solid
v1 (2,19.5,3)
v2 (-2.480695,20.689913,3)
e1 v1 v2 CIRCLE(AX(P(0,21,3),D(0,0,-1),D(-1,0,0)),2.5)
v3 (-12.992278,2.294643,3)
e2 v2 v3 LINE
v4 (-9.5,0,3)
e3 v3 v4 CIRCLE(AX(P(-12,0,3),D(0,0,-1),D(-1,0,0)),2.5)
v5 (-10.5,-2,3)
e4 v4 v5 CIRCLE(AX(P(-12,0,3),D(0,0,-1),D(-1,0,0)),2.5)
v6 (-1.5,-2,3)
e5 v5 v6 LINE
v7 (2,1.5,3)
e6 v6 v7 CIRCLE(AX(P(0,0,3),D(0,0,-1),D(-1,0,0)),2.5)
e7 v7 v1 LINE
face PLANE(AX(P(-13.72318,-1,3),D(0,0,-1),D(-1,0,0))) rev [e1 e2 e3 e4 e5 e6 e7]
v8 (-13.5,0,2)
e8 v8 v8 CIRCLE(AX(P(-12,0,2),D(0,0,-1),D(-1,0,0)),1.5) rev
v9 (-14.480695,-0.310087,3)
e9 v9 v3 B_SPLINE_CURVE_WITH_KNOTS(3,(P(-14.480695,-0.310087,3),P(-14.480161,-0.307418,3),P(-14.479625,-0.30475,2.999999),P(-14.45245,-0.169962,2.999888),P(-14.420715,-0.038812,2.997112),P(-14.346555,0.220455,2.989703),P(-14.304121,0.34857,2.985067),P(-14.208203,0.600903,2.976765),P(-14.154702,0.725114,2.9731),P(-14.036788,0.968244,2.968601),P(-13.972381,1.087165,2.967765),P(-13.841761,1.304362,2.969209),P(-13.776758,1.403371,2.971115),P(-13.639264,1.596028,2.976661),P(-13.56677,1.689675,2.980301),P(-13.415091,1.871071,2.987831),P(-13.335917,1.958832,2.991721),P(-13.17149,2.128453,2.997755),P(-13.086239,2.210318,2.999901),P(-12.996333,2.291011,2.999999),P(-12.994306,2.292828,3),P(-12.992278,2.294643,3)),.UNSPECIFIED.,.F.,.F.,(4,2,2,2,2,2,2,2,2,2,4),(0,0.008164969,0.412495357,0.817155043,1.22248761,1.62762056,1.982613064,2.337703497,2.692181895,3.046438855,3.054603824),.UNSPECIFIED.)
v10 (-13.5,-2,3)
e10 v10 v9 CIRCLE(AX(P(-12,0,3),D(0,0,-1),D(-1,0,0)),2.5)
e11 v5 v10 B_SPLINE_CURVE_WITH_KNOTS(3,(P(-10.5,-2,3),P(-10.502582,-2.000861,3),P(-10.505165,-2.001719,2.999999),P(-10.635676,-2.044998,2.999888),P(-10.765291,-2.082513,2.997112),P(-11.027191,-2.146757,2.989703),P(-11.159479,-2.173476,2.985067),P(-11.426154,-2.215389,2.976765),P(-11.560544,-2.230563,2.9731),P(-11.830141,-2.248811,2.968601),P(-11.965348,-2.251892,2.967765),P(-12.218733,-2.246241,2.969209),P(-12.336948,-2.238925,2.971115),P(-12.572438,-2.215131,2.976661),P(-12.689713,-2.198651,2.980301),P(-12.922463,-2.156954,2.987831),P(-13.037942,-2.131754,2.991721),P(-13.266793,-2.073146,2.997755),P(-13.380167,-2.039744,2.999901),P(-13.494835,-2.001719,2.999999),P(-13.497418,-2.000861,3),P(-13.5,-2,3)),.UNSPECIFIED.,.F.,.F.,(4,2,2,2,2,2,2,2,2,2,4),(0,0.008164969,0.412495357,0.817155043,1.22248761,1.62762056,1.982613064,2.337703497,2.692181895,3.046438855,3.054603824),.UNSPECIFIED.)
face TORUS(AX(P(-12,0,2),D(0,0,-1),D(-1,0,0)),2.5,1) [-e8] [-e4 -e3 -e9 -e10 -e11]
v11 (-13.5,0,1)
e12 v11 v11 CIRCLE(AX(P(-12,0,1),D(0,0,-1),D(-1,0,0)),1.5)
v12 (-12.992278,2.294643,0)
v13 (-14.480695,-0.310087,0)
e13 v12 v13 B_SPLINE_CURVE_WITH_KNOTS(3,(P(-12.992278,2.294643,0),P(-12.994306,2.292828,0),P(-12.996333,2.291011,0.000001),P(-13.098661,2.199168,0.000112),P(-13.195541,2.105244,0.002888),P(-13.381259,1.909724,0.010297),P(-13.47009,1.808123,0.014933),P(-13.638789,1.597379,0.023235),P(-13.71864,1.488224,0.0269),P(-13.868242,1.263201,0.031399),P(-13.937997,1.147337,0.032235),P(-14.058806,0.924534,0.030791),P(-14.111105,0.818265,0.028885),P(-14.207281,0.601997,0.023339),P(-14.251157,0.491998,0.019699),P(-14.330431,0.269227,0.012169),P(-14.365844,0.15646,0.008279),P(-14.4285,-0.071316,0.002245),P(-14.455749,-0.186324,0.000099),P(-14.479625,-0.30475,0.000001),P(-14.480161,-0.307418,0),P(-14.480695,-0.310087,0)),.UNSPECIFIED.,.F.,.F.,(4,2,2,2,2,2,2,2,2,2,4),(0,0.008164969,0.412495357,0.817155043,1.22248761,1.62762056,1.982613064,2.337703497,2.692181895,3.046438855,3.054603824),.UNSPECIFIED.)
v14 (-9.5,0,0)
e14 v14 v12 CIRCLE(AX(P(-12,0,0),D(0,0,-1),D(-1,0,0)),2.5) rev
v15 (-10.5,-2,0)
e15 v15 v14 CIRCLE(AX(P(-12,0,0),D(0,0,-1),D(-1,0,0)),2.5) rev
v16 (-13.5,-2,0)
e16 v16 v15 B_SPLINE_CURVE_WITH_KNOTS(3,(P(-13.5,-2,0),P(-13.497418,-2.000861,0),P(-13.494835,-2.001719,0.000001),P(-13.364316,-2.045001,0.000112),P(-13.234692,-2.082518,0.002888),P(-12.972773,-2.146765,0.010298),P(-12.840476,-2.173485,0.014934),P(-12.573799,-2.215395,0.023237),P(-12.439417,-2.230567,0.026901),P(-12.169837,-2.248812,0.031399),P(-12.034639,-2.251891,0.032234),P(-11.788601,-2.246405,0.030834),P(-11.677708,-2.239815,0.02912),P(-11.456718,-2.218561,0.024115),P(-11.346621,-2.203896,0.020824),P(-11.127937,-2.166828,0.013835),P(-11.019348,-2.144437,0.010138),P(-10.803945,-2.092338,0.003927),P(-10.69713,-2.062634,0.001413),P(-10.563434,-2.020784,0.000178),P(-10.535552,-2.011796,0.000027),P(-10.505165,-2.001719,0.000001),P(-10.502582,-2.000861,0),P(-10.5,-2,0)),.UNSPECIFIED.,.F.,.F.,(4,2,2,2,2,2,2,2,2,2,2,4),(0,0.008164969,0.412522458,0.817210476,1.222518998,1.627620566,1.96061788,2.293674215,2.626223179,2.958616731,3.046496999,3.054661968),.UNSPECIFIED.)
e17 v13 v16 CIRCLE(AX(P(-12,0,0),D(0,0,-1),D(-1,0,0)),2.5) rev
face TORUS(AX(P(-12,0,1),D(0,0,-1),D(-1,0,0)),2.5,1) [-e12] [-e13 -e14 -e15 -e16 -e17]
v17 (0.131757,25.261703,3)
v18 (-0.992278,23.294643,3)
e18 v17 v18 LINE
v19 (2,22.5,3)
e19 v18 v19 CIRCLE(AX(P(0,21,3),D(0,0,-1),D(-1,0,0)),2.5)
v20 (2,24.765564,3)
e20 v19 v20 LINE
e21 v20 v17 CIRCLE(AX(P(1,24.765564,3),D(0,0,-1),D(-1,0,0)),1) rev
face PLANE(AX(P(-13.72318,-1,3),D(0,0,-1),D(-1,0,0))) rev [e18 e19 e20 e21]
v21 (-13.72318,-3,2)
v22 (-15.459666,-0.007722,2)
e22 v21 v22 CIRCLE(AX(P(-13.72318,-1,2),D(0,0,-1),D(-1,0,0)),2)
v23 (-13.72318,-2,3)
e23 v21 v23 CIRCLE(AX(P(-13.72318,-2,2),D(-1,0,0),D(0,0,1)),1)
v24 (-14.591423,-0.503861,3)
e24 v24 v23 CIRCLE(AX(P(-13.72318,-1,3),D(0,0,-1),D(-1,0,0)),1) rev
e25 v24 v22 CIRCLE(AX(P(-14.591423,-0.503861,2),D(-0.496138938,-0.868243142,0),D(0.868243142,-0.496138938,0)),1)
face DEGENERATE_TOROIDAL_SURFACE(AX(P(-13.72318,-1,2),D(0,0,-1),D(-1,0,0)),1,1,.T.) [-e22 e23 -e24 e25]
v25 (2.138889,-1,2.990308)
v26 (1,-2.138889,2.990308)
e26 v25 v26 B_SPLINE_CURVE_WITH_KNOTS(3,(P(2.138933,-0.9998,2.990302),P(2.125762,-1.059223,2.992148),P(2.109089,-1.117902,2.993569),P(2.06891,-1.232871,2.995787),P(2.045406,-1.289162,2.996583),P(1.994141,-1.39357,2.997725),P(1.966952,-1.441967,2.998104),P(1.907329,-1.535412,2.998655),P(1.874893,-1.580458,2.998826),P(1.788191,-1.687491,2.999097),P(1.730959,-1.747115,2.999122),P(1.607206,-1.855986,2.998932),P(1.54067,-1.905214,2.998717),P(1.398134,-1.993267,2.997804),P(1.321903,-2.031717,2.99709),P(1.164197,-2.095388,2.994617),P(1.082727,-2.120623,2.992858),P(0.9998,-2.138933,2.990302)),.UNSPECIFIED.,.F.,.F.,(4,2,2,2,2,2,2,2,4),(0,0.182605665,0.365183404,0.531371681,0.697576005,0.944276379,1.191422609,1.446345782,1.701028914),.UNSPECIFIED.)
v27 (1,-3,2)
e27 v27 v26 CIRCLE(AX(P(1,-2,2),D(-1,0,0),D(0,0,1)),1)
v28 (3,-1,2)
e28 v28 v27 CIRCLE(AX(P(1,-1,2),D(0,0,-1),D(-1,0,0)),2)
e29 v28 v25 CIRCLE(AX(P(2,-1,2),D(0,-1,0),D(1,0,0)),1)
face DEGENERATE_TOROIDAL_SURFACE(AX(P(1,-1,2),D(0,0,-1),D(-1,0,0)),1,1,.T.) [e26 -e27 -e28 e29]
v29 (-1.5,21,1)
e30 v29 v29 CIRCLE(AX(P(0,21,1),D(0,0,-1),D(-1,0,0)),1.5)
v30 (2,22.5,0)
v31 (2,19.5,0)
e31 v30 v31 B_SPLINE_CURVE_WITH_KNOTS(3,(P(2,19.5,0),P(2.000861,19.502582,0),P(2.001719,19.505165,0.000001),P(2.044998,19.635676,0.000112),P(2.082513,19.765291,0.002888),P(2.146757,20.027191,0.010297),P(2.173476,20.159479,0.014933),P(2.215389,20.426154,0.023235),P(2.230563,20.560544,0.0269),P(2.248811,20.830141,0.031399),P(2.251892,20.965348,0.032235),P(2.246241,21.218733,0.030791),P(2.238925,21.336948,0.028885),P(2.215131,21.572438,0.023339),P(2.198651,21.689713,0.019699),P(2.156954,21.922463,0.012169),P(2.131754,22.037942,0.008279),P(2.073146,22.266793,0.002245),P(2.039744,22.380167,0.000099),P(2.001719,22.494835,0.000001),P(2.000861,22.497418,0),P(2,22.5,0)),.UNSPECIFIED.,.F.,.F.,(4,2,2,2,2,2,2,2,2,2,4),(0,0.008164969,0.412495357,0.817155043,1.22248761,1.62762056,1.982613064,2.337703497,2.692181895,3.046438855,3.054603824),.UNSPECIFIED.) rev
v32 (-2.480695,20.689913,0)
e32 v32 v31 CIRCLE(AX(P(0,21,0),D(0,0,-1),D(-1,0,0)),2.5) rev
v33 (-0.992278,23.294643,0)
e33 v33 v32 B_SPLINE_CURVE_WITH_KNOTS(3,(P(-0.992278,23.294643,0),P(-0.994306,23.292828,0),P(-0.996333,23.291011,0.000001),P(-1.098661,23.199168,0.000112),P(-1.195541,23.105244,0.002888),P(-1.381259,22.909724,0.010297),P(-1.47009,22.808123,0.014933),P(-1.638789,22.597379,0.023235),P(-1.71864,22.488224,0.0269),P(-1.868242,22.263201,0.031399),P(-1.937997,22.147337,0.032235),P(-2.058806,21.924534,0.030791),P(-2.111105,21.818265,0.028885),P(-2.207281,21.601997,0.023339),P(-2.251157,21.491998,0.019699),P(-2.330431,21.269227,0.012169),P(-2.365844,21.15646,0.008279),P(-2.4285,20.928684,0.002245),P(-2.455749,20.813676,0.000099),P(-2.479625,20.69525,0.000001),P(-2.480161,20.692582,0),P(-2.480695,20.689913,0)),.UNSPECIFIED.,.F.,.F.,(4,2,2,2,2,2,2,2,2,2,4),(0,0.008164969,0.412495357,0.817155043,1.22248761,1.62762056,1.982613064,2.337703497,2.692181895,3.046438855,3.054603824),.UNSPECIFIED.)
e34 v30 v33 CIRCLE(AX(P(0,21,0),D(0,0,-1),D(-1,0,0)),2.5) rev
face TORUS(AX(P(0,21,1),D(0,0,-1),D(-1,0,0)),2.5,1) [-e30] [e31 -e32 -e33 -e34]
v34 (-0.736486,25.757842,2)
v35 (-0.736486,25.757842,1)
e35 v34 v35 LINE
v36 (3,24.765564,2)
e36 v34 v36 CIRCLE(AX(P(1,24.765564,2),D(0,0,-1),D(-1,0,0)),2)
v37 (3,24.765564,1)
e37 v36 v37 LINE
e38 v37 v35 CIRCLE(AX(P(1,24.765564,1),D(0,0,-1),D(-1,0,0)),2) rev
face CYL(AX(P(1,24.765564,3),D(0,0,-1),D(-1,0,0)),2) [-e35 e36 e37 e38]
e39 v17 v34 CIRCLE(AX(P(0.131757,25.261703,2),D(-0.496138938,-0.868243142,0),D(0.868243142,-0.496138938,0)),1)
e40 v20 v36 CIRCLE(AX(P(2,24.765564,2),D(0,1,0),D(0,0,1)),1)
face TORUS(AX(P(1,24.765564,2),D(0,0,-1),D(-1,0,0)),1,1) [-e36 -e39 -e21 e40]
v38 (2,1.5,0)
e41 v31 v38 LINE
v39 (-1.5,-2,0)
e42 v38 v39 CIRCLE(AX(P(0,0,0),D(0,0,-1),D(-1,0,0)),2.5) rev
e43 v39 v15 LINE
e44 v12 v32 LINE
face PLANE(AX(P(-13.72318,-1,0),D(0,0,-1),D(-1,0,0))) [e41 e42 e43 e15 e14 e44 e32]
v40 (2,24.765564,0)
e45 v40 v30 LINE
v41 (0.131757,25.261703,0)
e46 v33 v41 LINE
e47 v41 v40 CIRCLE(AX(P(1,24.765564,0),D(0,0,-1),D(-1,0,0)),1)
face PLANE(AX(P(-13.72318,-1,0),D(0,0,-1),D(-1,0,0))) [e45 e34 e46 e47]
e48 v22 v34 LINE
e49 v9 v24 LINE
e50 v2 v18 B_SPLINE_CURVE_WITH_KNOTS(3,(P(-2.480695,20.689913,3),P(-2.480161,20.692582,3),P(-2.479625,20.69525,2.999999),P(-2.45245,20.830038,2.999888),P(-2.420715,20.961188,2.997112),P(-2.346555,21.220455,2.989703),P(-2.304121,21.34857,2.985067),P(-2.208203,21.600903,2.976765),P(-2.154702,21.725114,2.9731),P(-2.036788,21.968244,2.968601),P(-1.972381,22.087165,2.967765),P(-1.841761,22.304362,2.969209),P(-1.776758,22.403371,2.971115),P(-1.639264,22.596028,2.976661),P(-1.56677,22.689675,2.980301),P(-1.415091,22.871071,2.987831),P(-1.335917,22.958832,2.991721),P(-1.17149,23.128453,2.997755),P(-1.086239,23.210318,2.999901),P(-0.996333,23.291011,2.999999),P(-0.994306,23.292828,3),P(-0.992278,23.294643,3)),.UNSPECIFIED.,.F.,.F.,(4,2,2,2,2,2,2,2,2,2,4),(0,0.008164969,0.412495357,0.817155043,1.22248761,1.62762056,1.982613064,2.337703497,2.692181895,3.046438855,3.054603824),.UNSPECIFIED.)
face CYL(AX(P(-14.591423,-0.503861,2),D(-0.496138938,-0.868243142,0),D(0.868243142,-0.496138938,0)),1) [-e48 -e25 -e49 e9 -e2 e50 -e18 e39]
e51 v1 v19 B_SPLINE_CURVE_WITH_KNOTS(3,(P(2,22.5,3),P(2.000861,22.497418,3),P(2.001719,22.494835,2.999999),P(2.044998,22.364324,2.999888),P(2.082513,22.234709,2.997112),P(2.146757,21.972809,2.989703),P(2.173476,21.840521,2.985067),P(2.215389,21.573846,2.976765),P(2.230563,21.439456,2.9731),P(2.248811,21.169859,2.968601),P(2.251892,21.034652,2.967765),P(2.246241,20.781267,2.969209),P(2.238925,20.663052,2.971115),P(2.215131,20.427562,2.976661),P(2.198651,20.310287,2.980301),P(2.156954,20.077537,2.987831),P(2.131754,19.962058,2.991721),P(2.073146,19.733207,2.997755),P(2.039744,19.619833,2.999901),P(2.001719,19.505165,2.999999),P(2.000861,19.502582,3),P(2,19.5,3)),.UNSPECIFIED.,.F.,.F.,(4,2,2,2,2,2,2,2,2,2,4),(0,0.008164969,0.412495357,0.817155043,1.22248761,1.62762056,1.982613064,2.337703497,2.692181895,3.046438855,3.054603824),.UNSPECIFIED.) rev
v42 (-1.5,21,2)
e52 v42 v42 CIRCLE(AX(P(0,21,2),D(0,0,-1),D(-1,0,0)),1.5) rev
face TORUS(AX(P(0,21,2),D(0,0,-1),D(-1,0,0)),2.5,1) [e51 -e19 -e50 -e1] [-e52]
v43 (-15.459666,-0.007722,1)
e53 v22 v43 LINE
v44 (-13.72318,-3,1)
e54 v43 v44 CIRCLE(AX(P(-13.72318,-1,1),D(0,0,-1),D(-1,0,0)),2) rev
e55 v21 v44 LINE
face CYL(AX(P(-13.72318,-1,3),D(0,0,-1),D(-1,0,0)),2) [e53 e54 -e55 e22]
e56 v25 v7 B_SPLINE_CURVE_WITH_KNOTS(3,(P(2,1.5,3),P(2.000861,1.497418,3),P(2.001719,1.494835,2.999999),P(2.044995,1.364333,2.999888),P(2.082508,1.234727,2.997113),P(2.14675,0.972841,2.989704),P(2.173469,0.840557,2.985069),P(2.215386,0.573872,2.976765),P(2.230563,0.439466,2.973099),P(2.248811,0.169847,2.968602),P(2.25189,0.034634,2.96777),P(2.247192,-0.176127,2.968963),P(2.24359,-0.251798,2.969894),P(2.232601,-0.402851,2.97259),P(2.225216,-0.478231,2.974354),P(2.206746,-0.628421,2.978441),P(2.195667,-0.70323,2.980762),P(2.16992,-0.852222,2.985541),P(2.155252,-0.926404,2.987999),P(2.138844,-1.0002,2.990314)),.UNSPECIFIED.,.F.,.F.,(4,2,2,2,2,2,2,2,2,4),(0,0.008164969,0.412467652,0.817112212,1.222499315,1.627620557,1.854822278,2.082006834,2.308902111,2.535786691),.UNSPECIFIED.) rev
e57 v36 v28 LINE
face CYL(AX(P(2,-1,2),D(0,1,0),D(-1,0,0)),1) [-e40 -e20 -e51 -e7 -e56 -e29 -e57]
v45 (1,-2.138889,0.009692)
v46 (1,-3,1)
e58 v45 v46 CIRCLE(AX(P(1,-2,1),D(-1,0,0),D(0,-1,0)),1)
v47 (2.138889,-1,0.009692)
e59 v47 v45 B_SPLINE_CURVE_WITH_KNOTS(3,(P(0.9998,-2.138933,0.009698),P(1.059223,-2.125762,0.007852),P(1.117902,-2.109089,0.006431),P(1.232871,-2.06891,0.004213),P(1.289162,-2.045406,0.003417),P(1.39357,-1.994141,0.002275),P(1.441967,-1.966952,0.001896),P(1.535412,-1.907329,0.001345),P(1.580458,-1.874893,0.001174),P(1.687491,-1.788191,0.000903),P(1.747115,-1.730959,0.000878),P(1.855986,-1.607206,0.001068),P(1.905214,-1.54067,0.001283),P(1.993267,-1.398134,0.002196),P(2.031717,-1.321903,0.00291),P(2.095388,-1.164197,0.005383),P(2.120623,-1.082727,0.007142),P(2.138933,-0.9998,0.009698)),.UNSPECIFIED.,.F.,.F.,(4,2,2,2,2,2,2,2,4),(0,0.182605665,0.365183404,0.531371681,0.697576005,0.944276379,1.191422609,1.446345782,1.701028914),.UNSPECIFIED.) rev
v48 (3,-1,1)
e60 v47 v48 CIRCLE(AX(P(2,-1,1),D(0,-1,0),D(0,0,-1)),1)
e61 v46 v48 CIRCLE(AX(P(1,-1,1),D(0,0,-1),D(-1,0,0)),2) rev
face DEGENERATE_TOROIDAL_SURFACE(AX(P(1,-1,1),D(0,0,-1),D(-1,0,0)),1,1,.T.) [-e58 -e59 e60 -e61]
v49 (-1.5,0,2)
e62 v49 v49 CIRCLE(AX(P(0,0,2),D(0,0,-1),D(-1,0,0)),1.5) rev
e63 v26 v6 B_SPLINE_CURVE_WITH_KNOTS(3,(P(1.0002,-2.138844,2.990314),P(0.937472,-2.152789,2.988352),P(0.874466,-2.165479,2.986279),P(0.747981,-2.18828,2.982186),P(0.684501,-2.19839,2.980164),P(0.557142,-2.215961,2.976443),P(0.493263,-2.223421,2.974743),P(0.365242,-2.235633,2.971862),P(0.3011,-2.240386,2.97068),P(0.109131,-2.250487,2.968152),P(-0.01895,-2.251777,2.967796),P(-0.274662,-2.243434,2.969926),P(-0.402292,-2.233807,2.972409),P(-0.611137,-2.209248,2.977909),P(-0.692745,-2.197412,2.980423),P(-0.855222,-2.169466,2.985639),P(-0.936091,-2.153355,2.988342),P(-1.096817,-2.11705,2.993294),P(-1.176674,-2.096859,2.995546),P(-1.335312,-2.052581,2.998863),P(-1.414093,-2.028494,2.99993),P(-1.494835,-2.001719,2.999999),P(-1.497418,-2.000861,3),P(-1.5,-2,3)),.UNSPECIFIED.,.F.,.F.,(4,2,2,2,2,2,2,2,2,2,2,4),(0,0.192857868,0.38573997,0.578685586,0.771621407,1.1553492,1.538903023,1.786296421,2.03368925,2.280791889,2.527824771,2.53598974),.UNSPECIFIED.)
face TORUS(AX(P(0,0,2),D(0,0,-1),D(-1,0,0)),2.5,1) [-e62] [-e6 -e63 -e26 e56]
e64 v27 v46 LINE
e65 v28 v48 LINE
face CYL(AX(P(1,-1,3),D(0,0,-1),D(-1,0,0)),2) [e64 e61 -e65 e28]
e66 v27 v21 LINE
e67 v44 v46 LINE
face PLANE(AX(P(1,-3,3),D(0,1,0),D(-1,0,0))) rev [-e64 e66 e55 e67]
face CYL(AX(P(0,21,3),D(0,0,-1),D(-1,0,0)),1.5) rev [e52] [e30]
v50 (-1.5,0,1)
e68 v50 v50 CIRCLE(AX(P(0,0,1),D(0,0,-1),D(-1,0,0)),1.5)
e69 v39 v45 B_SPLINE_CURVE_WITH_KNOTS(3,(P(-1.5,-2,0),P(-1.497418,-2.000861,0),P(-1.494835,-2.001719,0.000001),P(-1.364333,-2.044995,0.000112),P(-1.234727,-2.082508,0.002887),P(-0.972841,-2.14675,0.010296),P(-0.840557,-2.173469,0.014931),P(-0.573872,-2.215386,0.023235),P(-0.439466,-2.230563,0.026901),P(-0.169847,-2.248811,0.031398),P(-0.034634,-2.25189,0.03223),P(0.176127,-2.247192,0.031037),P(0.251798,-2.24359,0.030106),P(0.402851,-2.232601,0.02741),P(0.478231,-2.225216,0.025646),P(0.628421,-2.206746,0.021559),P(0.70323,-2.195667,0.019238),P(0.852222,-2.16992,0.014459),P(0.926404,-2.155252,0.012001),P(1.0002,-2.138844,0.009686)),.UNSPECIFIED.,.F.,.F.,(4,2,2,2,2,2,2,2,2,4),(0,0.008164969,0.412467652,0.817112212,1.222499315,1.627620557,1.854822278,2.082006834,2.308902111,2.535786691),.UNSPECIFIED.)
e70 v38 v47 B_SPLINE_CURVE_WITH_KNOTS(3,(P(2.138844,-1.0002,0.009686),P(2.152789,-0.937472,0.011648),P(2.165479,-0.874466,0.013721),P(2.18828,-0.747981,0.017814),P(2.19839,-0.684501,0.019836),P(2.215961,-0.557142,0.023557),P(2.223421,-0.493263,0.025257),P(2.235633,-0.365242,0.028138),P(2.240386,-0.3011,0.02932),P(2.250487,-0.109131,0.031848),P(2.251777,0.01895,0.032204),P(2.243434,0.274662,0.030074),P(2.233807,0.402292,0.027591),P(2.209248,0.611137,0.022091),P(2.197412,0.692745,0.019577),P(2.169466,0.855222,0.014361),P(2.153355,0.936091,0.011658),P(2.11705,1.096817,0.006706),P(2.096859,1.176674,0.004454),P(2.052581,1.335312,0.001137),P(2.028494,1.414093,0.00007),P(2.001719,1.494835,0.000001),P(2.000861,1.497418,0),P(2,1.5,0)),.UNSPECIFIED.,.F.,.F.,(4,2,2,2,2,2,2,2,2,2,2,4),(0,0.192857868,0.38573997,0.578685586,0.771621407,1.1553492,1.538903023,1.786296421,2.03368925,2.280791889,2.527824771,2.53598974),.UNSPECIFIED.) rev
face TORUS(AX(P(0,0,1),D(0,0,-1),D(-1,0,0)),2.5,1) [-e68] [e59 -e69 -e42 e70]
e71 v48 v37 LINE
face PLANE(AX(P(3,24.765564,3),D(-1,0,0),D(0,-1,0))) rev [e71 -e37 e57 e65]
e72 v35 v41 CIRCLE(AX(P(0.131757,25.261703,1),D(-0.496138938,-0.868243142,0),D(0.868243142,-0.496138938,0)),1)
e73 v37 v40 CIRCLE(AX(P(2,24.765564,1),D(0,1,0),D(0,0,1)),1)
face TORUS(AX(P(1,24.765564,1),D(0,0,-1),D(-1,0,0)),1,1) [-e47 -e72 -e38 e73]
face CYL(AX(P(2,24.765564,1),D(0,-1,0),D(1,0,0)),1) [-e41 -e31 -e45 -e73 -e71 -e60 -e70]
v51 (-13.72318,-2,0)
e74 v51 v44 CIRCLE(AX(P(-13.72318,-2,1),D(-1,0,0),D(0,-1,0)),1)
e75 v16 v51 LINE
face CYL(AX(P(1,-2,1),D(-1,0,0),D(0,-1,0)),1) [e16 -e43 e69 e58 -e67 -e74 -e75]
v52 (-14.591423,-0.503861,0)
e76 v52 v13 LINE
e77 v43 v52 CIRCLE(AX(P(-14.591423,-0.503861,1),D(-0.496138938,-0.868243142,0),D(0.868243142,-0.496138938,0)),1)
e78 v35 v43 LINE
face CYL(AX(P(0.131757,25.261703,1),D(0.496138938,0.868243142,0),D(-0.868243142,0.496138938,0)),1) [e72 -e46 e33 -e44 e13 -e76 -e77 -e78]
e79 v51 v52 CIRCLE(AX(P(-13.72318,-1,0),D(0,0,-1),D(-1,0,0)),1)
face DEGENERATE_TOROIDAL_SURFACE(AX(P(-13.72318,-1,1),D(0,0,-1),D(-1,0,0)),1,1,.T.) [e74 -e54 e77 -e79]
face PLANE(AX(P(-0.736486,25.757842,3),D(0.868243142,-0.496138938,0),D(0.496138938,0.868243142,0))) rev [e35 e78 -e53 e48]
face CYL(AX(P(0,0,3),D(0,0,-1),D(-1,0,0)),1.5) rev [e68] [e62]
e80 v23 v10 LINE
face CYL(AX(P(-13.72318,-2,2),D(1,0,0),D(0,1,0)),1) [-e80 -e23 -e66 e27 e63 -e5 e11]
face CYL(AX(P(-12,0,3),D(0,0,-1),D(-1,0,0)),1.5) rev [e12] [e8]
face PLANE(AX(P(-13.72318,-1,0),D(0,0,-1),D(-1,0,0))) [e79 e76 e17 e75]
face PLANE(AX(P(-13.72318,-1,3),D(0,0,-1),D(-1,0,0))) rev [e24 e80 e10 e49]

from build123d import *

# Parameters (mm, degrees)
SKETCH1_R           = 1.5
BOSS_EXTRUDE1_DEPTH = 3
FILLET1_R           = 1


with BuildPart() as part:
    # Sketch1 → Boss-Extrude1 (new body)
    with BuildSketch(Plane.XY):
        with BuildLine():
            Line((3, 24.765564437), (3, -1))
            ThreePointArc((3, -1), (2.414213562, -2.414213562), (1, -3))
            Line((1, -3), (-12, -3))
            Line((-12, -3), (-13.723179678, -3))
            ThreePointArc((-13.723179678, -3), (-15.452999865, -2.003853636), (-15.459665963, -0.007722123))
            Line((-15.459665963, -0.007722123), (-0.736486284, 25.757842314))
            ThreePointArc((-0.736486284, 25.757842314), (1.51333587, 26.698563735), (3, 24.765564437))
        make_face()
        Circle(SKETCH1_R, mode=Mode.SUBTRACT)
        with Locations((0, 21)):
            Circle(SKETCH1_R, mode=Mode.SUBTRACT)
        with Locations((-12, 0)):
            Circle(SKETCH1_R, mode=Mode.SUBTRACT)
    extrude(amount=BOSS_EXTRUDE1_DEPTH)

    # Fillet1
    # the kernel refuses this fillet: 1 mm, written as the material it takes off along each edge
    with BuildSketch(Plane(origin=(-13.723179678, -1, 0), x_dir=(0, -1, 0), z_dir=(1, 0, 0))) as fillet1_piece_1:
        with BuildLine():
            CenterArc((2 - FILLET1_R, -FILLET1_R), FILLET1_R, 0, 90)
            Line((2 - FILLET1_R, 0), (2, 0))
            Line((2, 0), (2, -FILLET1_R))
        make_face()
    revolve(axis=Axis((-13.723179678, -1, 0), (0, 0, -1)), revolution_arc=119.744881297, mode=Mode.SUBTRACT)
    with BuildSketch(Plane(origin=(1, -1, 3), x_dir=(1, 0, 0), z_dir=(0, 1, 0))) as fillet1_piece_2:
        with BuildLine():
            CenterArc((2 - FILLET1_R, FILLET1_R), FILLET1_R, 270, 90)
            Line((2, FILLET1_R), (2, 0))
            Line((2, 0), (2 - FILLET1_R, 0))
        make_face()
    revolve(axis=Axis((1, -1, 3), (0, 0, -1)), revolution_arc=90, mode=Mode.SUBTRACT)
    with BuildSketch(Plane(origin=(0, 21, 0), x_dir=(1, 0, 0), z_dir=(0, -1, 0))) as fillet1_piece_3:
        with BuildLine():
            CenterArc((1.5 + FILLET1_R, FILLET1_R), FILLET1_R, 180, 90)
            Line((1.5 + FILLET1_R, 0), (1.5, 0))
            Line((1.5, 0), (1.5, FILLET1_R))
        make_face()
    revolve(axis=Axis((0, 21, 0), (0, 0, 1)), mode=Mode.SUBTRACT)
    with BuildSketch(Plane(origin=(0, 21, 3), x_dir=(1, 0, 0), z_dir=(0, -1, 0))) as fillet1_piece_4:
        with BuildLine():
            CenterArc((1.5 + FILLET1_R, -FILLET1_R), FILLET1_R, 90, 90)
            Line((1.5, -FILLET1_R), (1.5, 0))
            Line((1.5, 0), (1.5 + FILLET1_R, 0))
        make_face()
    revolve(axis=Axis((0, 21, 3), (0, 0, 1)), mode=Mode.SUBTRACT)
    with BuildSketch(Plane(origin=(3, 24.765564437, 3), x_dir=(0, 0, -1), z_dir=(0, -1, 0))) as fillet1_piece_5:
        with BuildLine():
            CenterArc((FILLET1_R, -FILLET1_R), FILLET1_R, 90, 90)
            Line((0, -FILLET1_R), (0, 0))
            Line((0, 0), (FILLET1_R, 0))
        make_face()
    extrude(amount=25.765564437, mode=Mode.SUBTRACT)
    with BuildSketch(Plane(origin=(0, 0, 0), x_dir=(1, 0, 0), z_dir=(0, -1, 0))) as fillet1_piece_6:
        with BuildLine():
            CenterArc((1.5 + FILLET1_R, FILLET1_R), FILLET1_R, 180, 90)
            Line((1.5 + FILLET1_R, 0), (1.5, 0))
            Line((1.5, 0), (1.5, FILLET1_R))
        make_face()
    revolve(axis=Axis((0, 0, 0), (0, 0, 1)), mode=Mode.SUBTRACT)
    with BuildSketch(Plane(origin=(0, 0, 3), x_dir=(1, 0, 0), z_dir=(0, -1, 0))) as fillet1_piece_7:
        with BuildLine():
            CenterArc((1.5 + FILLET1_R, -FILLET1_R), FILLET1_R, 90, 90)
            Line((1.5, -FILLET1_R), (1.5, 0))
            Line((1.5, 0), (1.5 + FILLET1_R, 0))
        make_face()
    revolve(axis=Axis((0, 0, 3), (0, 0, 1)), mode=Mode.SUBTRACT)
    with BuildSketch(Plane(origin=(1, 24.765564437, 3), x_dir=(-0.8682431421244858, 0.49613893835678746, 0), z_dir=(-0.49613893835678746, -0.8682431421244858, 0))) as fillet1_piece_8:
        with BuildLine():
            CenterArc((2 - FILLET1_R, FILLET1_R), FILLET1_R, 270, 90)
            Line((2, FILLET1_R), (2, 0))
            Line((2, 0), (2 - FILLET1_R, 0))
        make_face()
    revolve(axis=Axis((1, 24.765564437, 3), (0, 0, -1)), revolution_arc=150.255118703, mode=Mode.SUBTRACT)
    with BuildSketch(Plane(origin=(-12, 0, 0), x_dir=(1, 0, 0), z_dir=(0, -1, 0))) as fillet1_piece_9:
        with BuildLine():
            CenterArc((1.5 + FILLET1_R, FILLET1_R), FILLET1_R, 180, 90)
            Line((1.5 + FILLET1_R, 0), (1.5, 0))
            Line((1.5, 0), (1.5, FILLET1_R))
        make_face()
    revolve(axis=Axis((-12, 0, 0), (0, 0, 1)), mode=Mode.SUBTRACT)
    with BuildSketch(Plane(origin=(-12, 0, 3), x_dir=(1, 0, 0), z_dir=(0, -1, 0))) as fillet1_piece_10:
        with BuildLine():
            CenterArc((1.5 + FILLET1_R, -FILLET1_R), FILLET1_R, 90, 90)
            Line((1.5, -FILLET1_R), (1.5, 0))
            Line((1.5, 0), (1.5 + FILLET1_R, 0))
        make_face()
    revolve(axis=Axis((-12, 0, 3), (0, 0, 1)), mode=Mode.SUBTRACT)
    with BuildSketch(Plane(origin=(-15.459665963, -0.007722123, 3), x_dir=(0.8682431421244593, -0.4961389383568337, 0), z_dir=(0.49613893835683376, 0.8682431421244593, 0)), Plane(origin=(-15.459665963, -0.007722123, 0), x_dir=(0, 0, 1), z_dir=(0.49613893835683376, 0.8682431421244593, 0))) as fillet1_piece_11:
        with BuildLine():
            CenterArc((FILLET1_R, FILLET1_R), FILLET1_R, 180, 90)
            Line((0, FILLET1_R), (0, 0))
            Line((0, 0), (FILLET1_R, 0))
        make_face()
    extrude(amount=29.67551736, mode=Mode.SUBTRACT)
    with BuildSketch(Plane(origin=(-13.723179678, -1, 3), x_dir=(0, -1, 0), z_dir=(1, 0, 0))) as fillet1_piece_12:
        with BuildLine():
            CenterArc((2 - FILLET1_R, FILLET1_R), FILLET1_R, 270, 90)
            Line((2, FILLET1_R), (2, 0))
            Line((2, 0), (2 - FILLET1_R, 0))
        make_face()
    revolve(axis=Axis((-13.723179678, -1, 3), (0, 0, -1)), revolution_arc=119.744881297, mode=Mode.SUBTRACT)
    with BuildSketch(Plane(origin=(1, 24.765564437, 0), x_dir=(-0.8682431421244858, 0.49613893835678746, 0), z_dir=(-0.49613893835678746, -0.8682431421244858, 0))) as fillet1_piece_13:
        with BuildLine():
            CenterArc((2 - FILLET1_R, -FILLET1_R), FILLET1_R, 0, 90)
            Line((2, -FILLET1_R), (2, 0))
            Line((2, 0), (2 - FILLET1_R, 0))
        make_face()
    revolve(axis=Axis((1, 24.765564437, 0), (0, 0, -1)), revolution_arc=150.255118703, mode=Mode.SUBTRACT)
    with BuildSketch(Plane(origin=(3, 24.765564437, 0), x_dir=(0, 0, 1), z_dir=(0, -1, 0))) as fillet1_piece_14:
        with BuildLine():
            CenterArc((FILLET1_R, FILLET1_R), FILLET1_R, 180, 90)
            Line((0, FILLET1_R), (0, 0))
            Line((0, 0), (FILLET1_R, 0))
        make_face()
    extrude(amount=25.765564437, mode=Mode.SUBTRACT)
    with BuildSketch(Plane(origin=(1, -1, 0), x_dir=(1, 0, 0), z_dir=(0, 1, 0))) as fillet1_piece_15:
        with BuildLine():
            CenterArc((2 - FILLET1_R, -FILLET1_R), FILLET1_R, 0, 90)
            Line((2, -FILLET1_R), (2, 0))
            Line((2, 0), (2 - FILLET1_R, 0))
        make_face()
    revolve(axis=Axis((1, -1, 0), (0, 0, -1)), revolution_arc=90, mode=Mode.SUBTRACT)
    with BuildSketch(Plane(origin=(1, -3, 3), x_dir=(0, 1, 0), z_dir=(-1, 0, 0))) as fillet1_piece_16:
        with BuildLine():
            CenterArc((FILLET1_R, FILLET1_R), FILLET1_R, 180, 90)
            Line((0, FILLET1_R), (0, 0))
            Line((0, 0), (FILLET1_R, 0))
        make_face()
    extrude(amount=14.723179678, mode=Mode.SUBTRACT)
    with BuildSketch(Plane(origin=(-13.723179678, -3, 0), x_dir=(0, 0, 1), z_dir=(1, 0, 0))) as fillet1_piece_17:
        with BuildLine():
            CenterArc((FILLET1_R, -FILLET1_R), FILLET1_R, 90, 90)
            Line((0, -FILLET1_R), (0, 0))
            Line((0, 0), (FILLET1_R, 0))
        make_face()
    extrude(amount=14.723179678, mode=Mode.SUBTRACT)


solid = part.part
